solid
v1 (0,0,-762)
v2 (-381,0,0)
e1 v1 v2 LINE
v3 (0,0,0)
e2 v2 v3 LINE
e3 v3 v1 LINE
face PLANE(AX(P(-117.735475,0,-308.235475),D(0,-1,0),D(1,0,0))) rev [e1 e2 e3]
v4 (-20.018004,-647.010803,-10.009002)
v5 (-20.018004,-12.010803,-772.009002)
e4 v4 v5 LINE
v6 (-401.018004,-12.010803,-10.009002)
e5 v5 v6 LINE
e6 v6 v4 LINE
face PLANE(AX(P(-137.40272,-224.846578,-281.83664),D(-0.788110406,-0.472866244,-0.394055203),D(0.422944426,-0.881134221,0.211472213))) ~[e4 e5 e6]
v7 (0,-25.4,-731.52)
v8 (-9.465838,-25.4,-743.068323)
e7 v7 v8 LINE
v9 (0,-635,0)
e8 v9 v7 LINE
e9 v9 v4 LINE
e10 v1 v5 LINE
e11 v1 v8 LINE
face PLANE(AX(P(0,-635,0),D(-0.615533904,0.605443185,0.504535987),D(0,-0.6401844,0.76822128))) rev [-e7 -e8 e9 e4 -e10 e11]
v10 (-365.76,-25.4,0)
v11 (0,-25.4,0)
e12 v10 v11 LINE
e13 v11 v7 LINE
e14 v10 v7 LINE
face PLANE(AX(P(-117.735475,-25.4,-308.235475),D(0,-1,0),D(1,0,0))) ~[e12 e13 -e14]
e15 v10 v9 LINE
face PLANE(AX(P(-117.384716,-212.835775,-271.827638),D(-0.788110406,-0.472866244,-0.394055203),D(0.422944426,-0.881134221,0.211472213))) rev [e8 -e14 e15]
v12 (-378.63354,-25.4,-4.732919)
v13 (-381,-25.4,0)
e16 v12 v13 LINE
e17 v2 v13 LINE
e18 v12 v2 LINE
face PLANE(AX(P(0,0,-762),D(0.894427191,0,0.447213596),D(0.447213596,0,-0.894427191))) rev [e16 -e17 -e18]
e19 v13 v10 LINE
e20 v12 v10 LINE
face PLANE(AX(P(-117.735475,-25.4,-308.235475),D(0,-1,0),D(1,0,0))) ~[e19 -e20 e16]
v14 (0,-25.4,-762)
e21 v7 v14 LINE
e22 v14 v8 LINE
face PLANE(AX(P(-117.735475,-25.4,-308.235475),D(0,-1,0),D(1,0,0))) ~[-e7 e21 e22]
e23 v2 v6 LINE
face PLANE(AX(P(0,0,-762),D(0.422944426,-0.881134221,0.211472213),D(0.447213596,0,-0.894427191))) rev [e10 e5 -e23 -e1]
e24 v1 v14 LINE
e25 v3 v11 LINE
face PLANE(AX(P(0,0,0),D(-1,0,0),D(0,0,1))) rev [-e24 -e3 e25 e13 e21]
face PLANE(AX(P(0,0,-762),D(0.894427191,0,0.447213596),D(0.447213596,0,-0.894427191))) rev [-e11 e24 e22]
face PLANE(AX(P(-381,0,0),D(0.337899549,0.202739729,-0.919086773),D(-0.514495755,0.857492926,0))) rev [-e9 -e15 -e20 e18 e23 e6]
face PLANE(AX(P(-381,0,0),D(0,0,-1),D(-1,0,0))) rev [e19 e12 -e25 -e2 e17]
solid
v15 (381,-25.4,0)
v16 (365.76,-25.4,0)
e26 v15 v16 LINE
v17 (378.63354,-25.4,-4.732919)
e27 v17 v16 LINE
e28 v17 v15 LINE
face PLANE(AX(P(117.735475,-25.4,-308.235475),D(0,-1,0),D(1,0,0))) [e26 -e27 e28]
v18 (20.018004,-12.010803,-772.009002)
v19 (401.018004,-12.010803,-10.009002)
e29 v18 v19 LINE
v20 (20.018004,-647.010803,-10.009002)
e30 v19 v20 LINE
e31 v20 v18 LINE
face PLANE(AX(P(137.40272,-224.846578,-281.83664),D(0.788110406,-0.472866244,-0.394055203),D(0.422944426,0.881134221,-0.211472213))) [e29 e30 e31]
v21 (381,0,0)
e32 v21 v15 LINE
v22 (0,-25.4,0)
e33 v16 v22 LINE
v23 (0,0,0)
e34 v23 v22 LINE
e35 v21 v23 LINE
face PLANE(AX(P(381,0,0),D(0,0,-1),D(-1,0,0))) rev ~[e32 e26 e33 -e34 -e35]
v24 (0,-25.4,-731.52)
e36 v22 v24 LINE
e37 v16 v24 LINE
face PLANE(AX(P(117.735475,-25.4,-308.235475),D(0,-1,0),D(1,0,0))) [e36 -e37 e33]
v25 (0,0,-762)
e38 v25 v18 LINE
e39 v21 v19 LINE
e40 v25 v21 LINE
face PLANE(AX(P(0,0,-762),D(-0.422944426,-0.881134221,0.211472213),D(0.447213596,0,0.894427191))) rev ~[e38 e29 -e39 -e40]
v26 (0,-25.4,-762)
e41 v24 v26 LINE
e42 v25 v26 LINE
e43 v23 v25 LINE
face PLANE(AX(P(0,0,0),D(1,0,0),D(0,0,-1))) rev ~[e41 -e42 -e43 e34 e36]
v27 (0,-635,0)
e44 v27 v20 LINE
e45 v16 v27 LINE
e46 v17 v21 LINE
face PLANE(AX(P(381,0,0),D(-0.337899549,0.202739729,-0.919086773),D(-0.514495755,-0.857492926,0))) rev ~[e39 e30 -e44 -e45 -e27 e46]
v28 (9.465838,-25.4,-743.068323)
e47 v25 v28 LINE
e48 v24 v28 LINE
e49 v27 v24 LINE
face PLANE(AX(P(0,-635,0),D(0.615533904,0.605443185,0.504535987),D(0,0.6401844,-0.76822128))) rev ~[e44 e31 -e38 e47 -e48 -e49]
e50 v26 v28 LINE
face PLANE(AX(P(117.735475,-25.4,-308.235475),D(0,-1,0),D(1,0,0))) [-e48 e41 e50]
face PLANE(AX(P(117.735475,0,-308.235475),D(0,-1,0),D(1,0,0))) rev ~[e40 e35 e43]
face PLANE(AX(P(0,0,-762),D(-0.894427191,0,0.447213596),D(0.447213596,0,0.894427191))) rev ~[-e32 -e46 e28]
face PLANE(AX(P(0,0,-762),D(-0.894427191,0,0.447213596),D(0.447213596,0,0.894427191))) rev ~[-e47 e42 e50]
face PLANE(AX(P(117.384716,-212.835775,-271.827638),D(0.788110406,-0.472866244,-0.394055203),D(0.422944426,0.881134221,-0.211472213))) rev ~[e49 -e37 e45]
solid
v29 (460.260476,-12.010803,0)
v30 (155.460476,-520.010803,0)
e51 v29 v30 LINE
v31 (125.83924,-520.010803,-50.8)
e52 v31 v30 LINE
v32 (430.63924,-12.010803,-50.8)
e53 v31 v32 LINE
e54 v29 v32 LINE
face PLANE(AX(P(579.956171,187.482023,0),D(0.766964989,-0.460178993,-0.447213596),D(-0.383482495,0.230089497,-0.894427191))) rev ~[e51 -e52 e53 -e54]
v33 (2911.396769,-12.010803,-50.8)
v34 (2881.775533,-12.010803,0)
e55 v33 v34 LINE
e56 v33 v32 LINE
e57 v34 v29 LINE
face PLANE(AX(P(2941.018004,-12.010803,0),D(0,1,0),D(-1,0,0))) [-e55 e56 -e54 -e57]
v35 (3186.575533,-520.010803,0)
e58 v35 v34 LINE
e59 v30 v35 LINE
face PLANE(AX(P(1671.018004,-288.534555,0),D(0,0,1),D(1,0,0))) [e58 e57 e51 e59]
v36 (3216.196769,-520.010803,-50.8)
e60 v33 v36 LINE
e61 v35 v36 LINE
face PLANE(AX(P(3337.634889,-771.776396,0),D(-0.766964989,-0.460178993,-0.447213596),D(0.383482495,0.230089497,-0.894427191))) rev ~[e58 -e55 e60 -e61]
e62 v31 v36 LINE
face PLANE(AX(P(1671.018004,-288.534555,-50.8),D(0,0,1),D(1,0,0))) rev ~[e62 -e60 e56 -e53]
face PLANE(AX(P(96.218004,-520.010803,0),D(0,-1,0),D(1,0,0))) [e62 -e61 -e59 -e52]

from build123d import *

# Parameters (mm, degrees)
F4_DEPTH     = 25.4
F5_DEPTH     = 25.4
F8_DEPTH     = 50.8
F9_T1_DEPTH  = 1118.6779391399
F10_T1_DEPTH = 1118.6779391399


# Not quite as in the source:
# - a fillet or chamfer that OpenCascade refuses, or shapes differently, is made with other operations: its cross-section is extruded or revolved along the edge and cut away or added


with BuildPart() as f4:
    # F3 (on 3pt) → F4 (new body)
    with BuildSketch(Plane(origin=(236.6459627329, -141.9875776398, -118.3229813665), x_dir=(0.4229444261, 0.8811342211, -0.2114722131), z_dir=(0.7881104062, -0.4728662437, -0.3940552031))):
        Polygon((161.141826348, -681.5535195419), (161.141826348, 170.3883798855), (-559.5202303749, 0), align=None)
    extrude(amount=F4_DEPTH)

    # F1 (on Front) → F5 (join)
    with BuildSketch(Plane.XZ):
        Polygon((381, 0), (0, 0), (0, -762), align=None)
    extrude(amount=F5_DEPTH)


with BuildPart() as f6_1:
    # F6: instance of F4
    add(f4.part.mirror(Plane.YZ))


with BuildPart() as f8:
    # F7 (on Top) → F8 (new body)
    with BuildSketch(Plane.XY):
        Polygon((2941.0180043185, -12.0108025911), (401.0180043185, -12.0108025911), (96.2180043185, -520.0108025911), (401.0180043185, -520.0108025911), (2941.0180043185, -520.0108025911), (3245.8180043185, -520.0108025911), align=None)
    extrude(amount=-F8_DEPTH)

    # F9: chamfer of 50.8 x 101.5999998984 on 1 edges, made by hand

    # F9_s2 → F9_t1 (cut)
    with BuildSketch(Plane(origin=(236.2304668654, 393.7174447757, 0), x_dir=(0, 0, 1), z_dir=(-0.5144957554, -0.8574929257, 0))):
        Polygon((0, -400.8496087388), (-101.5999998984, -350.0496087388), (0, -350.0496087388), align=None)
    extrude(amount=F9_T1_DEPTH, mode=Mode.SUBTRACT)

    # F10: chamfer of 50.8 x 101.5999998984 on 1 edges, made by hand

    # F10_s2 → F10_t1 (cut)
    with BuildSketch(Plane(origin=(1223.981175034, -2039.9686250567, 0), x_dir=(0, 0, 1), z_dir=(-0.5144957554, 0.8574929257, 0))):
        Polygon((0, 2464.9226261439), (-101.5999998984, 2515.7226261439), (0, 2515.7226261439), align=None)
    extrude(amount=F10_T1_DEPTH, mode=Mode.SUBTRACT)


solid = Compound([f4.part, f6_1.part, f8.part])
